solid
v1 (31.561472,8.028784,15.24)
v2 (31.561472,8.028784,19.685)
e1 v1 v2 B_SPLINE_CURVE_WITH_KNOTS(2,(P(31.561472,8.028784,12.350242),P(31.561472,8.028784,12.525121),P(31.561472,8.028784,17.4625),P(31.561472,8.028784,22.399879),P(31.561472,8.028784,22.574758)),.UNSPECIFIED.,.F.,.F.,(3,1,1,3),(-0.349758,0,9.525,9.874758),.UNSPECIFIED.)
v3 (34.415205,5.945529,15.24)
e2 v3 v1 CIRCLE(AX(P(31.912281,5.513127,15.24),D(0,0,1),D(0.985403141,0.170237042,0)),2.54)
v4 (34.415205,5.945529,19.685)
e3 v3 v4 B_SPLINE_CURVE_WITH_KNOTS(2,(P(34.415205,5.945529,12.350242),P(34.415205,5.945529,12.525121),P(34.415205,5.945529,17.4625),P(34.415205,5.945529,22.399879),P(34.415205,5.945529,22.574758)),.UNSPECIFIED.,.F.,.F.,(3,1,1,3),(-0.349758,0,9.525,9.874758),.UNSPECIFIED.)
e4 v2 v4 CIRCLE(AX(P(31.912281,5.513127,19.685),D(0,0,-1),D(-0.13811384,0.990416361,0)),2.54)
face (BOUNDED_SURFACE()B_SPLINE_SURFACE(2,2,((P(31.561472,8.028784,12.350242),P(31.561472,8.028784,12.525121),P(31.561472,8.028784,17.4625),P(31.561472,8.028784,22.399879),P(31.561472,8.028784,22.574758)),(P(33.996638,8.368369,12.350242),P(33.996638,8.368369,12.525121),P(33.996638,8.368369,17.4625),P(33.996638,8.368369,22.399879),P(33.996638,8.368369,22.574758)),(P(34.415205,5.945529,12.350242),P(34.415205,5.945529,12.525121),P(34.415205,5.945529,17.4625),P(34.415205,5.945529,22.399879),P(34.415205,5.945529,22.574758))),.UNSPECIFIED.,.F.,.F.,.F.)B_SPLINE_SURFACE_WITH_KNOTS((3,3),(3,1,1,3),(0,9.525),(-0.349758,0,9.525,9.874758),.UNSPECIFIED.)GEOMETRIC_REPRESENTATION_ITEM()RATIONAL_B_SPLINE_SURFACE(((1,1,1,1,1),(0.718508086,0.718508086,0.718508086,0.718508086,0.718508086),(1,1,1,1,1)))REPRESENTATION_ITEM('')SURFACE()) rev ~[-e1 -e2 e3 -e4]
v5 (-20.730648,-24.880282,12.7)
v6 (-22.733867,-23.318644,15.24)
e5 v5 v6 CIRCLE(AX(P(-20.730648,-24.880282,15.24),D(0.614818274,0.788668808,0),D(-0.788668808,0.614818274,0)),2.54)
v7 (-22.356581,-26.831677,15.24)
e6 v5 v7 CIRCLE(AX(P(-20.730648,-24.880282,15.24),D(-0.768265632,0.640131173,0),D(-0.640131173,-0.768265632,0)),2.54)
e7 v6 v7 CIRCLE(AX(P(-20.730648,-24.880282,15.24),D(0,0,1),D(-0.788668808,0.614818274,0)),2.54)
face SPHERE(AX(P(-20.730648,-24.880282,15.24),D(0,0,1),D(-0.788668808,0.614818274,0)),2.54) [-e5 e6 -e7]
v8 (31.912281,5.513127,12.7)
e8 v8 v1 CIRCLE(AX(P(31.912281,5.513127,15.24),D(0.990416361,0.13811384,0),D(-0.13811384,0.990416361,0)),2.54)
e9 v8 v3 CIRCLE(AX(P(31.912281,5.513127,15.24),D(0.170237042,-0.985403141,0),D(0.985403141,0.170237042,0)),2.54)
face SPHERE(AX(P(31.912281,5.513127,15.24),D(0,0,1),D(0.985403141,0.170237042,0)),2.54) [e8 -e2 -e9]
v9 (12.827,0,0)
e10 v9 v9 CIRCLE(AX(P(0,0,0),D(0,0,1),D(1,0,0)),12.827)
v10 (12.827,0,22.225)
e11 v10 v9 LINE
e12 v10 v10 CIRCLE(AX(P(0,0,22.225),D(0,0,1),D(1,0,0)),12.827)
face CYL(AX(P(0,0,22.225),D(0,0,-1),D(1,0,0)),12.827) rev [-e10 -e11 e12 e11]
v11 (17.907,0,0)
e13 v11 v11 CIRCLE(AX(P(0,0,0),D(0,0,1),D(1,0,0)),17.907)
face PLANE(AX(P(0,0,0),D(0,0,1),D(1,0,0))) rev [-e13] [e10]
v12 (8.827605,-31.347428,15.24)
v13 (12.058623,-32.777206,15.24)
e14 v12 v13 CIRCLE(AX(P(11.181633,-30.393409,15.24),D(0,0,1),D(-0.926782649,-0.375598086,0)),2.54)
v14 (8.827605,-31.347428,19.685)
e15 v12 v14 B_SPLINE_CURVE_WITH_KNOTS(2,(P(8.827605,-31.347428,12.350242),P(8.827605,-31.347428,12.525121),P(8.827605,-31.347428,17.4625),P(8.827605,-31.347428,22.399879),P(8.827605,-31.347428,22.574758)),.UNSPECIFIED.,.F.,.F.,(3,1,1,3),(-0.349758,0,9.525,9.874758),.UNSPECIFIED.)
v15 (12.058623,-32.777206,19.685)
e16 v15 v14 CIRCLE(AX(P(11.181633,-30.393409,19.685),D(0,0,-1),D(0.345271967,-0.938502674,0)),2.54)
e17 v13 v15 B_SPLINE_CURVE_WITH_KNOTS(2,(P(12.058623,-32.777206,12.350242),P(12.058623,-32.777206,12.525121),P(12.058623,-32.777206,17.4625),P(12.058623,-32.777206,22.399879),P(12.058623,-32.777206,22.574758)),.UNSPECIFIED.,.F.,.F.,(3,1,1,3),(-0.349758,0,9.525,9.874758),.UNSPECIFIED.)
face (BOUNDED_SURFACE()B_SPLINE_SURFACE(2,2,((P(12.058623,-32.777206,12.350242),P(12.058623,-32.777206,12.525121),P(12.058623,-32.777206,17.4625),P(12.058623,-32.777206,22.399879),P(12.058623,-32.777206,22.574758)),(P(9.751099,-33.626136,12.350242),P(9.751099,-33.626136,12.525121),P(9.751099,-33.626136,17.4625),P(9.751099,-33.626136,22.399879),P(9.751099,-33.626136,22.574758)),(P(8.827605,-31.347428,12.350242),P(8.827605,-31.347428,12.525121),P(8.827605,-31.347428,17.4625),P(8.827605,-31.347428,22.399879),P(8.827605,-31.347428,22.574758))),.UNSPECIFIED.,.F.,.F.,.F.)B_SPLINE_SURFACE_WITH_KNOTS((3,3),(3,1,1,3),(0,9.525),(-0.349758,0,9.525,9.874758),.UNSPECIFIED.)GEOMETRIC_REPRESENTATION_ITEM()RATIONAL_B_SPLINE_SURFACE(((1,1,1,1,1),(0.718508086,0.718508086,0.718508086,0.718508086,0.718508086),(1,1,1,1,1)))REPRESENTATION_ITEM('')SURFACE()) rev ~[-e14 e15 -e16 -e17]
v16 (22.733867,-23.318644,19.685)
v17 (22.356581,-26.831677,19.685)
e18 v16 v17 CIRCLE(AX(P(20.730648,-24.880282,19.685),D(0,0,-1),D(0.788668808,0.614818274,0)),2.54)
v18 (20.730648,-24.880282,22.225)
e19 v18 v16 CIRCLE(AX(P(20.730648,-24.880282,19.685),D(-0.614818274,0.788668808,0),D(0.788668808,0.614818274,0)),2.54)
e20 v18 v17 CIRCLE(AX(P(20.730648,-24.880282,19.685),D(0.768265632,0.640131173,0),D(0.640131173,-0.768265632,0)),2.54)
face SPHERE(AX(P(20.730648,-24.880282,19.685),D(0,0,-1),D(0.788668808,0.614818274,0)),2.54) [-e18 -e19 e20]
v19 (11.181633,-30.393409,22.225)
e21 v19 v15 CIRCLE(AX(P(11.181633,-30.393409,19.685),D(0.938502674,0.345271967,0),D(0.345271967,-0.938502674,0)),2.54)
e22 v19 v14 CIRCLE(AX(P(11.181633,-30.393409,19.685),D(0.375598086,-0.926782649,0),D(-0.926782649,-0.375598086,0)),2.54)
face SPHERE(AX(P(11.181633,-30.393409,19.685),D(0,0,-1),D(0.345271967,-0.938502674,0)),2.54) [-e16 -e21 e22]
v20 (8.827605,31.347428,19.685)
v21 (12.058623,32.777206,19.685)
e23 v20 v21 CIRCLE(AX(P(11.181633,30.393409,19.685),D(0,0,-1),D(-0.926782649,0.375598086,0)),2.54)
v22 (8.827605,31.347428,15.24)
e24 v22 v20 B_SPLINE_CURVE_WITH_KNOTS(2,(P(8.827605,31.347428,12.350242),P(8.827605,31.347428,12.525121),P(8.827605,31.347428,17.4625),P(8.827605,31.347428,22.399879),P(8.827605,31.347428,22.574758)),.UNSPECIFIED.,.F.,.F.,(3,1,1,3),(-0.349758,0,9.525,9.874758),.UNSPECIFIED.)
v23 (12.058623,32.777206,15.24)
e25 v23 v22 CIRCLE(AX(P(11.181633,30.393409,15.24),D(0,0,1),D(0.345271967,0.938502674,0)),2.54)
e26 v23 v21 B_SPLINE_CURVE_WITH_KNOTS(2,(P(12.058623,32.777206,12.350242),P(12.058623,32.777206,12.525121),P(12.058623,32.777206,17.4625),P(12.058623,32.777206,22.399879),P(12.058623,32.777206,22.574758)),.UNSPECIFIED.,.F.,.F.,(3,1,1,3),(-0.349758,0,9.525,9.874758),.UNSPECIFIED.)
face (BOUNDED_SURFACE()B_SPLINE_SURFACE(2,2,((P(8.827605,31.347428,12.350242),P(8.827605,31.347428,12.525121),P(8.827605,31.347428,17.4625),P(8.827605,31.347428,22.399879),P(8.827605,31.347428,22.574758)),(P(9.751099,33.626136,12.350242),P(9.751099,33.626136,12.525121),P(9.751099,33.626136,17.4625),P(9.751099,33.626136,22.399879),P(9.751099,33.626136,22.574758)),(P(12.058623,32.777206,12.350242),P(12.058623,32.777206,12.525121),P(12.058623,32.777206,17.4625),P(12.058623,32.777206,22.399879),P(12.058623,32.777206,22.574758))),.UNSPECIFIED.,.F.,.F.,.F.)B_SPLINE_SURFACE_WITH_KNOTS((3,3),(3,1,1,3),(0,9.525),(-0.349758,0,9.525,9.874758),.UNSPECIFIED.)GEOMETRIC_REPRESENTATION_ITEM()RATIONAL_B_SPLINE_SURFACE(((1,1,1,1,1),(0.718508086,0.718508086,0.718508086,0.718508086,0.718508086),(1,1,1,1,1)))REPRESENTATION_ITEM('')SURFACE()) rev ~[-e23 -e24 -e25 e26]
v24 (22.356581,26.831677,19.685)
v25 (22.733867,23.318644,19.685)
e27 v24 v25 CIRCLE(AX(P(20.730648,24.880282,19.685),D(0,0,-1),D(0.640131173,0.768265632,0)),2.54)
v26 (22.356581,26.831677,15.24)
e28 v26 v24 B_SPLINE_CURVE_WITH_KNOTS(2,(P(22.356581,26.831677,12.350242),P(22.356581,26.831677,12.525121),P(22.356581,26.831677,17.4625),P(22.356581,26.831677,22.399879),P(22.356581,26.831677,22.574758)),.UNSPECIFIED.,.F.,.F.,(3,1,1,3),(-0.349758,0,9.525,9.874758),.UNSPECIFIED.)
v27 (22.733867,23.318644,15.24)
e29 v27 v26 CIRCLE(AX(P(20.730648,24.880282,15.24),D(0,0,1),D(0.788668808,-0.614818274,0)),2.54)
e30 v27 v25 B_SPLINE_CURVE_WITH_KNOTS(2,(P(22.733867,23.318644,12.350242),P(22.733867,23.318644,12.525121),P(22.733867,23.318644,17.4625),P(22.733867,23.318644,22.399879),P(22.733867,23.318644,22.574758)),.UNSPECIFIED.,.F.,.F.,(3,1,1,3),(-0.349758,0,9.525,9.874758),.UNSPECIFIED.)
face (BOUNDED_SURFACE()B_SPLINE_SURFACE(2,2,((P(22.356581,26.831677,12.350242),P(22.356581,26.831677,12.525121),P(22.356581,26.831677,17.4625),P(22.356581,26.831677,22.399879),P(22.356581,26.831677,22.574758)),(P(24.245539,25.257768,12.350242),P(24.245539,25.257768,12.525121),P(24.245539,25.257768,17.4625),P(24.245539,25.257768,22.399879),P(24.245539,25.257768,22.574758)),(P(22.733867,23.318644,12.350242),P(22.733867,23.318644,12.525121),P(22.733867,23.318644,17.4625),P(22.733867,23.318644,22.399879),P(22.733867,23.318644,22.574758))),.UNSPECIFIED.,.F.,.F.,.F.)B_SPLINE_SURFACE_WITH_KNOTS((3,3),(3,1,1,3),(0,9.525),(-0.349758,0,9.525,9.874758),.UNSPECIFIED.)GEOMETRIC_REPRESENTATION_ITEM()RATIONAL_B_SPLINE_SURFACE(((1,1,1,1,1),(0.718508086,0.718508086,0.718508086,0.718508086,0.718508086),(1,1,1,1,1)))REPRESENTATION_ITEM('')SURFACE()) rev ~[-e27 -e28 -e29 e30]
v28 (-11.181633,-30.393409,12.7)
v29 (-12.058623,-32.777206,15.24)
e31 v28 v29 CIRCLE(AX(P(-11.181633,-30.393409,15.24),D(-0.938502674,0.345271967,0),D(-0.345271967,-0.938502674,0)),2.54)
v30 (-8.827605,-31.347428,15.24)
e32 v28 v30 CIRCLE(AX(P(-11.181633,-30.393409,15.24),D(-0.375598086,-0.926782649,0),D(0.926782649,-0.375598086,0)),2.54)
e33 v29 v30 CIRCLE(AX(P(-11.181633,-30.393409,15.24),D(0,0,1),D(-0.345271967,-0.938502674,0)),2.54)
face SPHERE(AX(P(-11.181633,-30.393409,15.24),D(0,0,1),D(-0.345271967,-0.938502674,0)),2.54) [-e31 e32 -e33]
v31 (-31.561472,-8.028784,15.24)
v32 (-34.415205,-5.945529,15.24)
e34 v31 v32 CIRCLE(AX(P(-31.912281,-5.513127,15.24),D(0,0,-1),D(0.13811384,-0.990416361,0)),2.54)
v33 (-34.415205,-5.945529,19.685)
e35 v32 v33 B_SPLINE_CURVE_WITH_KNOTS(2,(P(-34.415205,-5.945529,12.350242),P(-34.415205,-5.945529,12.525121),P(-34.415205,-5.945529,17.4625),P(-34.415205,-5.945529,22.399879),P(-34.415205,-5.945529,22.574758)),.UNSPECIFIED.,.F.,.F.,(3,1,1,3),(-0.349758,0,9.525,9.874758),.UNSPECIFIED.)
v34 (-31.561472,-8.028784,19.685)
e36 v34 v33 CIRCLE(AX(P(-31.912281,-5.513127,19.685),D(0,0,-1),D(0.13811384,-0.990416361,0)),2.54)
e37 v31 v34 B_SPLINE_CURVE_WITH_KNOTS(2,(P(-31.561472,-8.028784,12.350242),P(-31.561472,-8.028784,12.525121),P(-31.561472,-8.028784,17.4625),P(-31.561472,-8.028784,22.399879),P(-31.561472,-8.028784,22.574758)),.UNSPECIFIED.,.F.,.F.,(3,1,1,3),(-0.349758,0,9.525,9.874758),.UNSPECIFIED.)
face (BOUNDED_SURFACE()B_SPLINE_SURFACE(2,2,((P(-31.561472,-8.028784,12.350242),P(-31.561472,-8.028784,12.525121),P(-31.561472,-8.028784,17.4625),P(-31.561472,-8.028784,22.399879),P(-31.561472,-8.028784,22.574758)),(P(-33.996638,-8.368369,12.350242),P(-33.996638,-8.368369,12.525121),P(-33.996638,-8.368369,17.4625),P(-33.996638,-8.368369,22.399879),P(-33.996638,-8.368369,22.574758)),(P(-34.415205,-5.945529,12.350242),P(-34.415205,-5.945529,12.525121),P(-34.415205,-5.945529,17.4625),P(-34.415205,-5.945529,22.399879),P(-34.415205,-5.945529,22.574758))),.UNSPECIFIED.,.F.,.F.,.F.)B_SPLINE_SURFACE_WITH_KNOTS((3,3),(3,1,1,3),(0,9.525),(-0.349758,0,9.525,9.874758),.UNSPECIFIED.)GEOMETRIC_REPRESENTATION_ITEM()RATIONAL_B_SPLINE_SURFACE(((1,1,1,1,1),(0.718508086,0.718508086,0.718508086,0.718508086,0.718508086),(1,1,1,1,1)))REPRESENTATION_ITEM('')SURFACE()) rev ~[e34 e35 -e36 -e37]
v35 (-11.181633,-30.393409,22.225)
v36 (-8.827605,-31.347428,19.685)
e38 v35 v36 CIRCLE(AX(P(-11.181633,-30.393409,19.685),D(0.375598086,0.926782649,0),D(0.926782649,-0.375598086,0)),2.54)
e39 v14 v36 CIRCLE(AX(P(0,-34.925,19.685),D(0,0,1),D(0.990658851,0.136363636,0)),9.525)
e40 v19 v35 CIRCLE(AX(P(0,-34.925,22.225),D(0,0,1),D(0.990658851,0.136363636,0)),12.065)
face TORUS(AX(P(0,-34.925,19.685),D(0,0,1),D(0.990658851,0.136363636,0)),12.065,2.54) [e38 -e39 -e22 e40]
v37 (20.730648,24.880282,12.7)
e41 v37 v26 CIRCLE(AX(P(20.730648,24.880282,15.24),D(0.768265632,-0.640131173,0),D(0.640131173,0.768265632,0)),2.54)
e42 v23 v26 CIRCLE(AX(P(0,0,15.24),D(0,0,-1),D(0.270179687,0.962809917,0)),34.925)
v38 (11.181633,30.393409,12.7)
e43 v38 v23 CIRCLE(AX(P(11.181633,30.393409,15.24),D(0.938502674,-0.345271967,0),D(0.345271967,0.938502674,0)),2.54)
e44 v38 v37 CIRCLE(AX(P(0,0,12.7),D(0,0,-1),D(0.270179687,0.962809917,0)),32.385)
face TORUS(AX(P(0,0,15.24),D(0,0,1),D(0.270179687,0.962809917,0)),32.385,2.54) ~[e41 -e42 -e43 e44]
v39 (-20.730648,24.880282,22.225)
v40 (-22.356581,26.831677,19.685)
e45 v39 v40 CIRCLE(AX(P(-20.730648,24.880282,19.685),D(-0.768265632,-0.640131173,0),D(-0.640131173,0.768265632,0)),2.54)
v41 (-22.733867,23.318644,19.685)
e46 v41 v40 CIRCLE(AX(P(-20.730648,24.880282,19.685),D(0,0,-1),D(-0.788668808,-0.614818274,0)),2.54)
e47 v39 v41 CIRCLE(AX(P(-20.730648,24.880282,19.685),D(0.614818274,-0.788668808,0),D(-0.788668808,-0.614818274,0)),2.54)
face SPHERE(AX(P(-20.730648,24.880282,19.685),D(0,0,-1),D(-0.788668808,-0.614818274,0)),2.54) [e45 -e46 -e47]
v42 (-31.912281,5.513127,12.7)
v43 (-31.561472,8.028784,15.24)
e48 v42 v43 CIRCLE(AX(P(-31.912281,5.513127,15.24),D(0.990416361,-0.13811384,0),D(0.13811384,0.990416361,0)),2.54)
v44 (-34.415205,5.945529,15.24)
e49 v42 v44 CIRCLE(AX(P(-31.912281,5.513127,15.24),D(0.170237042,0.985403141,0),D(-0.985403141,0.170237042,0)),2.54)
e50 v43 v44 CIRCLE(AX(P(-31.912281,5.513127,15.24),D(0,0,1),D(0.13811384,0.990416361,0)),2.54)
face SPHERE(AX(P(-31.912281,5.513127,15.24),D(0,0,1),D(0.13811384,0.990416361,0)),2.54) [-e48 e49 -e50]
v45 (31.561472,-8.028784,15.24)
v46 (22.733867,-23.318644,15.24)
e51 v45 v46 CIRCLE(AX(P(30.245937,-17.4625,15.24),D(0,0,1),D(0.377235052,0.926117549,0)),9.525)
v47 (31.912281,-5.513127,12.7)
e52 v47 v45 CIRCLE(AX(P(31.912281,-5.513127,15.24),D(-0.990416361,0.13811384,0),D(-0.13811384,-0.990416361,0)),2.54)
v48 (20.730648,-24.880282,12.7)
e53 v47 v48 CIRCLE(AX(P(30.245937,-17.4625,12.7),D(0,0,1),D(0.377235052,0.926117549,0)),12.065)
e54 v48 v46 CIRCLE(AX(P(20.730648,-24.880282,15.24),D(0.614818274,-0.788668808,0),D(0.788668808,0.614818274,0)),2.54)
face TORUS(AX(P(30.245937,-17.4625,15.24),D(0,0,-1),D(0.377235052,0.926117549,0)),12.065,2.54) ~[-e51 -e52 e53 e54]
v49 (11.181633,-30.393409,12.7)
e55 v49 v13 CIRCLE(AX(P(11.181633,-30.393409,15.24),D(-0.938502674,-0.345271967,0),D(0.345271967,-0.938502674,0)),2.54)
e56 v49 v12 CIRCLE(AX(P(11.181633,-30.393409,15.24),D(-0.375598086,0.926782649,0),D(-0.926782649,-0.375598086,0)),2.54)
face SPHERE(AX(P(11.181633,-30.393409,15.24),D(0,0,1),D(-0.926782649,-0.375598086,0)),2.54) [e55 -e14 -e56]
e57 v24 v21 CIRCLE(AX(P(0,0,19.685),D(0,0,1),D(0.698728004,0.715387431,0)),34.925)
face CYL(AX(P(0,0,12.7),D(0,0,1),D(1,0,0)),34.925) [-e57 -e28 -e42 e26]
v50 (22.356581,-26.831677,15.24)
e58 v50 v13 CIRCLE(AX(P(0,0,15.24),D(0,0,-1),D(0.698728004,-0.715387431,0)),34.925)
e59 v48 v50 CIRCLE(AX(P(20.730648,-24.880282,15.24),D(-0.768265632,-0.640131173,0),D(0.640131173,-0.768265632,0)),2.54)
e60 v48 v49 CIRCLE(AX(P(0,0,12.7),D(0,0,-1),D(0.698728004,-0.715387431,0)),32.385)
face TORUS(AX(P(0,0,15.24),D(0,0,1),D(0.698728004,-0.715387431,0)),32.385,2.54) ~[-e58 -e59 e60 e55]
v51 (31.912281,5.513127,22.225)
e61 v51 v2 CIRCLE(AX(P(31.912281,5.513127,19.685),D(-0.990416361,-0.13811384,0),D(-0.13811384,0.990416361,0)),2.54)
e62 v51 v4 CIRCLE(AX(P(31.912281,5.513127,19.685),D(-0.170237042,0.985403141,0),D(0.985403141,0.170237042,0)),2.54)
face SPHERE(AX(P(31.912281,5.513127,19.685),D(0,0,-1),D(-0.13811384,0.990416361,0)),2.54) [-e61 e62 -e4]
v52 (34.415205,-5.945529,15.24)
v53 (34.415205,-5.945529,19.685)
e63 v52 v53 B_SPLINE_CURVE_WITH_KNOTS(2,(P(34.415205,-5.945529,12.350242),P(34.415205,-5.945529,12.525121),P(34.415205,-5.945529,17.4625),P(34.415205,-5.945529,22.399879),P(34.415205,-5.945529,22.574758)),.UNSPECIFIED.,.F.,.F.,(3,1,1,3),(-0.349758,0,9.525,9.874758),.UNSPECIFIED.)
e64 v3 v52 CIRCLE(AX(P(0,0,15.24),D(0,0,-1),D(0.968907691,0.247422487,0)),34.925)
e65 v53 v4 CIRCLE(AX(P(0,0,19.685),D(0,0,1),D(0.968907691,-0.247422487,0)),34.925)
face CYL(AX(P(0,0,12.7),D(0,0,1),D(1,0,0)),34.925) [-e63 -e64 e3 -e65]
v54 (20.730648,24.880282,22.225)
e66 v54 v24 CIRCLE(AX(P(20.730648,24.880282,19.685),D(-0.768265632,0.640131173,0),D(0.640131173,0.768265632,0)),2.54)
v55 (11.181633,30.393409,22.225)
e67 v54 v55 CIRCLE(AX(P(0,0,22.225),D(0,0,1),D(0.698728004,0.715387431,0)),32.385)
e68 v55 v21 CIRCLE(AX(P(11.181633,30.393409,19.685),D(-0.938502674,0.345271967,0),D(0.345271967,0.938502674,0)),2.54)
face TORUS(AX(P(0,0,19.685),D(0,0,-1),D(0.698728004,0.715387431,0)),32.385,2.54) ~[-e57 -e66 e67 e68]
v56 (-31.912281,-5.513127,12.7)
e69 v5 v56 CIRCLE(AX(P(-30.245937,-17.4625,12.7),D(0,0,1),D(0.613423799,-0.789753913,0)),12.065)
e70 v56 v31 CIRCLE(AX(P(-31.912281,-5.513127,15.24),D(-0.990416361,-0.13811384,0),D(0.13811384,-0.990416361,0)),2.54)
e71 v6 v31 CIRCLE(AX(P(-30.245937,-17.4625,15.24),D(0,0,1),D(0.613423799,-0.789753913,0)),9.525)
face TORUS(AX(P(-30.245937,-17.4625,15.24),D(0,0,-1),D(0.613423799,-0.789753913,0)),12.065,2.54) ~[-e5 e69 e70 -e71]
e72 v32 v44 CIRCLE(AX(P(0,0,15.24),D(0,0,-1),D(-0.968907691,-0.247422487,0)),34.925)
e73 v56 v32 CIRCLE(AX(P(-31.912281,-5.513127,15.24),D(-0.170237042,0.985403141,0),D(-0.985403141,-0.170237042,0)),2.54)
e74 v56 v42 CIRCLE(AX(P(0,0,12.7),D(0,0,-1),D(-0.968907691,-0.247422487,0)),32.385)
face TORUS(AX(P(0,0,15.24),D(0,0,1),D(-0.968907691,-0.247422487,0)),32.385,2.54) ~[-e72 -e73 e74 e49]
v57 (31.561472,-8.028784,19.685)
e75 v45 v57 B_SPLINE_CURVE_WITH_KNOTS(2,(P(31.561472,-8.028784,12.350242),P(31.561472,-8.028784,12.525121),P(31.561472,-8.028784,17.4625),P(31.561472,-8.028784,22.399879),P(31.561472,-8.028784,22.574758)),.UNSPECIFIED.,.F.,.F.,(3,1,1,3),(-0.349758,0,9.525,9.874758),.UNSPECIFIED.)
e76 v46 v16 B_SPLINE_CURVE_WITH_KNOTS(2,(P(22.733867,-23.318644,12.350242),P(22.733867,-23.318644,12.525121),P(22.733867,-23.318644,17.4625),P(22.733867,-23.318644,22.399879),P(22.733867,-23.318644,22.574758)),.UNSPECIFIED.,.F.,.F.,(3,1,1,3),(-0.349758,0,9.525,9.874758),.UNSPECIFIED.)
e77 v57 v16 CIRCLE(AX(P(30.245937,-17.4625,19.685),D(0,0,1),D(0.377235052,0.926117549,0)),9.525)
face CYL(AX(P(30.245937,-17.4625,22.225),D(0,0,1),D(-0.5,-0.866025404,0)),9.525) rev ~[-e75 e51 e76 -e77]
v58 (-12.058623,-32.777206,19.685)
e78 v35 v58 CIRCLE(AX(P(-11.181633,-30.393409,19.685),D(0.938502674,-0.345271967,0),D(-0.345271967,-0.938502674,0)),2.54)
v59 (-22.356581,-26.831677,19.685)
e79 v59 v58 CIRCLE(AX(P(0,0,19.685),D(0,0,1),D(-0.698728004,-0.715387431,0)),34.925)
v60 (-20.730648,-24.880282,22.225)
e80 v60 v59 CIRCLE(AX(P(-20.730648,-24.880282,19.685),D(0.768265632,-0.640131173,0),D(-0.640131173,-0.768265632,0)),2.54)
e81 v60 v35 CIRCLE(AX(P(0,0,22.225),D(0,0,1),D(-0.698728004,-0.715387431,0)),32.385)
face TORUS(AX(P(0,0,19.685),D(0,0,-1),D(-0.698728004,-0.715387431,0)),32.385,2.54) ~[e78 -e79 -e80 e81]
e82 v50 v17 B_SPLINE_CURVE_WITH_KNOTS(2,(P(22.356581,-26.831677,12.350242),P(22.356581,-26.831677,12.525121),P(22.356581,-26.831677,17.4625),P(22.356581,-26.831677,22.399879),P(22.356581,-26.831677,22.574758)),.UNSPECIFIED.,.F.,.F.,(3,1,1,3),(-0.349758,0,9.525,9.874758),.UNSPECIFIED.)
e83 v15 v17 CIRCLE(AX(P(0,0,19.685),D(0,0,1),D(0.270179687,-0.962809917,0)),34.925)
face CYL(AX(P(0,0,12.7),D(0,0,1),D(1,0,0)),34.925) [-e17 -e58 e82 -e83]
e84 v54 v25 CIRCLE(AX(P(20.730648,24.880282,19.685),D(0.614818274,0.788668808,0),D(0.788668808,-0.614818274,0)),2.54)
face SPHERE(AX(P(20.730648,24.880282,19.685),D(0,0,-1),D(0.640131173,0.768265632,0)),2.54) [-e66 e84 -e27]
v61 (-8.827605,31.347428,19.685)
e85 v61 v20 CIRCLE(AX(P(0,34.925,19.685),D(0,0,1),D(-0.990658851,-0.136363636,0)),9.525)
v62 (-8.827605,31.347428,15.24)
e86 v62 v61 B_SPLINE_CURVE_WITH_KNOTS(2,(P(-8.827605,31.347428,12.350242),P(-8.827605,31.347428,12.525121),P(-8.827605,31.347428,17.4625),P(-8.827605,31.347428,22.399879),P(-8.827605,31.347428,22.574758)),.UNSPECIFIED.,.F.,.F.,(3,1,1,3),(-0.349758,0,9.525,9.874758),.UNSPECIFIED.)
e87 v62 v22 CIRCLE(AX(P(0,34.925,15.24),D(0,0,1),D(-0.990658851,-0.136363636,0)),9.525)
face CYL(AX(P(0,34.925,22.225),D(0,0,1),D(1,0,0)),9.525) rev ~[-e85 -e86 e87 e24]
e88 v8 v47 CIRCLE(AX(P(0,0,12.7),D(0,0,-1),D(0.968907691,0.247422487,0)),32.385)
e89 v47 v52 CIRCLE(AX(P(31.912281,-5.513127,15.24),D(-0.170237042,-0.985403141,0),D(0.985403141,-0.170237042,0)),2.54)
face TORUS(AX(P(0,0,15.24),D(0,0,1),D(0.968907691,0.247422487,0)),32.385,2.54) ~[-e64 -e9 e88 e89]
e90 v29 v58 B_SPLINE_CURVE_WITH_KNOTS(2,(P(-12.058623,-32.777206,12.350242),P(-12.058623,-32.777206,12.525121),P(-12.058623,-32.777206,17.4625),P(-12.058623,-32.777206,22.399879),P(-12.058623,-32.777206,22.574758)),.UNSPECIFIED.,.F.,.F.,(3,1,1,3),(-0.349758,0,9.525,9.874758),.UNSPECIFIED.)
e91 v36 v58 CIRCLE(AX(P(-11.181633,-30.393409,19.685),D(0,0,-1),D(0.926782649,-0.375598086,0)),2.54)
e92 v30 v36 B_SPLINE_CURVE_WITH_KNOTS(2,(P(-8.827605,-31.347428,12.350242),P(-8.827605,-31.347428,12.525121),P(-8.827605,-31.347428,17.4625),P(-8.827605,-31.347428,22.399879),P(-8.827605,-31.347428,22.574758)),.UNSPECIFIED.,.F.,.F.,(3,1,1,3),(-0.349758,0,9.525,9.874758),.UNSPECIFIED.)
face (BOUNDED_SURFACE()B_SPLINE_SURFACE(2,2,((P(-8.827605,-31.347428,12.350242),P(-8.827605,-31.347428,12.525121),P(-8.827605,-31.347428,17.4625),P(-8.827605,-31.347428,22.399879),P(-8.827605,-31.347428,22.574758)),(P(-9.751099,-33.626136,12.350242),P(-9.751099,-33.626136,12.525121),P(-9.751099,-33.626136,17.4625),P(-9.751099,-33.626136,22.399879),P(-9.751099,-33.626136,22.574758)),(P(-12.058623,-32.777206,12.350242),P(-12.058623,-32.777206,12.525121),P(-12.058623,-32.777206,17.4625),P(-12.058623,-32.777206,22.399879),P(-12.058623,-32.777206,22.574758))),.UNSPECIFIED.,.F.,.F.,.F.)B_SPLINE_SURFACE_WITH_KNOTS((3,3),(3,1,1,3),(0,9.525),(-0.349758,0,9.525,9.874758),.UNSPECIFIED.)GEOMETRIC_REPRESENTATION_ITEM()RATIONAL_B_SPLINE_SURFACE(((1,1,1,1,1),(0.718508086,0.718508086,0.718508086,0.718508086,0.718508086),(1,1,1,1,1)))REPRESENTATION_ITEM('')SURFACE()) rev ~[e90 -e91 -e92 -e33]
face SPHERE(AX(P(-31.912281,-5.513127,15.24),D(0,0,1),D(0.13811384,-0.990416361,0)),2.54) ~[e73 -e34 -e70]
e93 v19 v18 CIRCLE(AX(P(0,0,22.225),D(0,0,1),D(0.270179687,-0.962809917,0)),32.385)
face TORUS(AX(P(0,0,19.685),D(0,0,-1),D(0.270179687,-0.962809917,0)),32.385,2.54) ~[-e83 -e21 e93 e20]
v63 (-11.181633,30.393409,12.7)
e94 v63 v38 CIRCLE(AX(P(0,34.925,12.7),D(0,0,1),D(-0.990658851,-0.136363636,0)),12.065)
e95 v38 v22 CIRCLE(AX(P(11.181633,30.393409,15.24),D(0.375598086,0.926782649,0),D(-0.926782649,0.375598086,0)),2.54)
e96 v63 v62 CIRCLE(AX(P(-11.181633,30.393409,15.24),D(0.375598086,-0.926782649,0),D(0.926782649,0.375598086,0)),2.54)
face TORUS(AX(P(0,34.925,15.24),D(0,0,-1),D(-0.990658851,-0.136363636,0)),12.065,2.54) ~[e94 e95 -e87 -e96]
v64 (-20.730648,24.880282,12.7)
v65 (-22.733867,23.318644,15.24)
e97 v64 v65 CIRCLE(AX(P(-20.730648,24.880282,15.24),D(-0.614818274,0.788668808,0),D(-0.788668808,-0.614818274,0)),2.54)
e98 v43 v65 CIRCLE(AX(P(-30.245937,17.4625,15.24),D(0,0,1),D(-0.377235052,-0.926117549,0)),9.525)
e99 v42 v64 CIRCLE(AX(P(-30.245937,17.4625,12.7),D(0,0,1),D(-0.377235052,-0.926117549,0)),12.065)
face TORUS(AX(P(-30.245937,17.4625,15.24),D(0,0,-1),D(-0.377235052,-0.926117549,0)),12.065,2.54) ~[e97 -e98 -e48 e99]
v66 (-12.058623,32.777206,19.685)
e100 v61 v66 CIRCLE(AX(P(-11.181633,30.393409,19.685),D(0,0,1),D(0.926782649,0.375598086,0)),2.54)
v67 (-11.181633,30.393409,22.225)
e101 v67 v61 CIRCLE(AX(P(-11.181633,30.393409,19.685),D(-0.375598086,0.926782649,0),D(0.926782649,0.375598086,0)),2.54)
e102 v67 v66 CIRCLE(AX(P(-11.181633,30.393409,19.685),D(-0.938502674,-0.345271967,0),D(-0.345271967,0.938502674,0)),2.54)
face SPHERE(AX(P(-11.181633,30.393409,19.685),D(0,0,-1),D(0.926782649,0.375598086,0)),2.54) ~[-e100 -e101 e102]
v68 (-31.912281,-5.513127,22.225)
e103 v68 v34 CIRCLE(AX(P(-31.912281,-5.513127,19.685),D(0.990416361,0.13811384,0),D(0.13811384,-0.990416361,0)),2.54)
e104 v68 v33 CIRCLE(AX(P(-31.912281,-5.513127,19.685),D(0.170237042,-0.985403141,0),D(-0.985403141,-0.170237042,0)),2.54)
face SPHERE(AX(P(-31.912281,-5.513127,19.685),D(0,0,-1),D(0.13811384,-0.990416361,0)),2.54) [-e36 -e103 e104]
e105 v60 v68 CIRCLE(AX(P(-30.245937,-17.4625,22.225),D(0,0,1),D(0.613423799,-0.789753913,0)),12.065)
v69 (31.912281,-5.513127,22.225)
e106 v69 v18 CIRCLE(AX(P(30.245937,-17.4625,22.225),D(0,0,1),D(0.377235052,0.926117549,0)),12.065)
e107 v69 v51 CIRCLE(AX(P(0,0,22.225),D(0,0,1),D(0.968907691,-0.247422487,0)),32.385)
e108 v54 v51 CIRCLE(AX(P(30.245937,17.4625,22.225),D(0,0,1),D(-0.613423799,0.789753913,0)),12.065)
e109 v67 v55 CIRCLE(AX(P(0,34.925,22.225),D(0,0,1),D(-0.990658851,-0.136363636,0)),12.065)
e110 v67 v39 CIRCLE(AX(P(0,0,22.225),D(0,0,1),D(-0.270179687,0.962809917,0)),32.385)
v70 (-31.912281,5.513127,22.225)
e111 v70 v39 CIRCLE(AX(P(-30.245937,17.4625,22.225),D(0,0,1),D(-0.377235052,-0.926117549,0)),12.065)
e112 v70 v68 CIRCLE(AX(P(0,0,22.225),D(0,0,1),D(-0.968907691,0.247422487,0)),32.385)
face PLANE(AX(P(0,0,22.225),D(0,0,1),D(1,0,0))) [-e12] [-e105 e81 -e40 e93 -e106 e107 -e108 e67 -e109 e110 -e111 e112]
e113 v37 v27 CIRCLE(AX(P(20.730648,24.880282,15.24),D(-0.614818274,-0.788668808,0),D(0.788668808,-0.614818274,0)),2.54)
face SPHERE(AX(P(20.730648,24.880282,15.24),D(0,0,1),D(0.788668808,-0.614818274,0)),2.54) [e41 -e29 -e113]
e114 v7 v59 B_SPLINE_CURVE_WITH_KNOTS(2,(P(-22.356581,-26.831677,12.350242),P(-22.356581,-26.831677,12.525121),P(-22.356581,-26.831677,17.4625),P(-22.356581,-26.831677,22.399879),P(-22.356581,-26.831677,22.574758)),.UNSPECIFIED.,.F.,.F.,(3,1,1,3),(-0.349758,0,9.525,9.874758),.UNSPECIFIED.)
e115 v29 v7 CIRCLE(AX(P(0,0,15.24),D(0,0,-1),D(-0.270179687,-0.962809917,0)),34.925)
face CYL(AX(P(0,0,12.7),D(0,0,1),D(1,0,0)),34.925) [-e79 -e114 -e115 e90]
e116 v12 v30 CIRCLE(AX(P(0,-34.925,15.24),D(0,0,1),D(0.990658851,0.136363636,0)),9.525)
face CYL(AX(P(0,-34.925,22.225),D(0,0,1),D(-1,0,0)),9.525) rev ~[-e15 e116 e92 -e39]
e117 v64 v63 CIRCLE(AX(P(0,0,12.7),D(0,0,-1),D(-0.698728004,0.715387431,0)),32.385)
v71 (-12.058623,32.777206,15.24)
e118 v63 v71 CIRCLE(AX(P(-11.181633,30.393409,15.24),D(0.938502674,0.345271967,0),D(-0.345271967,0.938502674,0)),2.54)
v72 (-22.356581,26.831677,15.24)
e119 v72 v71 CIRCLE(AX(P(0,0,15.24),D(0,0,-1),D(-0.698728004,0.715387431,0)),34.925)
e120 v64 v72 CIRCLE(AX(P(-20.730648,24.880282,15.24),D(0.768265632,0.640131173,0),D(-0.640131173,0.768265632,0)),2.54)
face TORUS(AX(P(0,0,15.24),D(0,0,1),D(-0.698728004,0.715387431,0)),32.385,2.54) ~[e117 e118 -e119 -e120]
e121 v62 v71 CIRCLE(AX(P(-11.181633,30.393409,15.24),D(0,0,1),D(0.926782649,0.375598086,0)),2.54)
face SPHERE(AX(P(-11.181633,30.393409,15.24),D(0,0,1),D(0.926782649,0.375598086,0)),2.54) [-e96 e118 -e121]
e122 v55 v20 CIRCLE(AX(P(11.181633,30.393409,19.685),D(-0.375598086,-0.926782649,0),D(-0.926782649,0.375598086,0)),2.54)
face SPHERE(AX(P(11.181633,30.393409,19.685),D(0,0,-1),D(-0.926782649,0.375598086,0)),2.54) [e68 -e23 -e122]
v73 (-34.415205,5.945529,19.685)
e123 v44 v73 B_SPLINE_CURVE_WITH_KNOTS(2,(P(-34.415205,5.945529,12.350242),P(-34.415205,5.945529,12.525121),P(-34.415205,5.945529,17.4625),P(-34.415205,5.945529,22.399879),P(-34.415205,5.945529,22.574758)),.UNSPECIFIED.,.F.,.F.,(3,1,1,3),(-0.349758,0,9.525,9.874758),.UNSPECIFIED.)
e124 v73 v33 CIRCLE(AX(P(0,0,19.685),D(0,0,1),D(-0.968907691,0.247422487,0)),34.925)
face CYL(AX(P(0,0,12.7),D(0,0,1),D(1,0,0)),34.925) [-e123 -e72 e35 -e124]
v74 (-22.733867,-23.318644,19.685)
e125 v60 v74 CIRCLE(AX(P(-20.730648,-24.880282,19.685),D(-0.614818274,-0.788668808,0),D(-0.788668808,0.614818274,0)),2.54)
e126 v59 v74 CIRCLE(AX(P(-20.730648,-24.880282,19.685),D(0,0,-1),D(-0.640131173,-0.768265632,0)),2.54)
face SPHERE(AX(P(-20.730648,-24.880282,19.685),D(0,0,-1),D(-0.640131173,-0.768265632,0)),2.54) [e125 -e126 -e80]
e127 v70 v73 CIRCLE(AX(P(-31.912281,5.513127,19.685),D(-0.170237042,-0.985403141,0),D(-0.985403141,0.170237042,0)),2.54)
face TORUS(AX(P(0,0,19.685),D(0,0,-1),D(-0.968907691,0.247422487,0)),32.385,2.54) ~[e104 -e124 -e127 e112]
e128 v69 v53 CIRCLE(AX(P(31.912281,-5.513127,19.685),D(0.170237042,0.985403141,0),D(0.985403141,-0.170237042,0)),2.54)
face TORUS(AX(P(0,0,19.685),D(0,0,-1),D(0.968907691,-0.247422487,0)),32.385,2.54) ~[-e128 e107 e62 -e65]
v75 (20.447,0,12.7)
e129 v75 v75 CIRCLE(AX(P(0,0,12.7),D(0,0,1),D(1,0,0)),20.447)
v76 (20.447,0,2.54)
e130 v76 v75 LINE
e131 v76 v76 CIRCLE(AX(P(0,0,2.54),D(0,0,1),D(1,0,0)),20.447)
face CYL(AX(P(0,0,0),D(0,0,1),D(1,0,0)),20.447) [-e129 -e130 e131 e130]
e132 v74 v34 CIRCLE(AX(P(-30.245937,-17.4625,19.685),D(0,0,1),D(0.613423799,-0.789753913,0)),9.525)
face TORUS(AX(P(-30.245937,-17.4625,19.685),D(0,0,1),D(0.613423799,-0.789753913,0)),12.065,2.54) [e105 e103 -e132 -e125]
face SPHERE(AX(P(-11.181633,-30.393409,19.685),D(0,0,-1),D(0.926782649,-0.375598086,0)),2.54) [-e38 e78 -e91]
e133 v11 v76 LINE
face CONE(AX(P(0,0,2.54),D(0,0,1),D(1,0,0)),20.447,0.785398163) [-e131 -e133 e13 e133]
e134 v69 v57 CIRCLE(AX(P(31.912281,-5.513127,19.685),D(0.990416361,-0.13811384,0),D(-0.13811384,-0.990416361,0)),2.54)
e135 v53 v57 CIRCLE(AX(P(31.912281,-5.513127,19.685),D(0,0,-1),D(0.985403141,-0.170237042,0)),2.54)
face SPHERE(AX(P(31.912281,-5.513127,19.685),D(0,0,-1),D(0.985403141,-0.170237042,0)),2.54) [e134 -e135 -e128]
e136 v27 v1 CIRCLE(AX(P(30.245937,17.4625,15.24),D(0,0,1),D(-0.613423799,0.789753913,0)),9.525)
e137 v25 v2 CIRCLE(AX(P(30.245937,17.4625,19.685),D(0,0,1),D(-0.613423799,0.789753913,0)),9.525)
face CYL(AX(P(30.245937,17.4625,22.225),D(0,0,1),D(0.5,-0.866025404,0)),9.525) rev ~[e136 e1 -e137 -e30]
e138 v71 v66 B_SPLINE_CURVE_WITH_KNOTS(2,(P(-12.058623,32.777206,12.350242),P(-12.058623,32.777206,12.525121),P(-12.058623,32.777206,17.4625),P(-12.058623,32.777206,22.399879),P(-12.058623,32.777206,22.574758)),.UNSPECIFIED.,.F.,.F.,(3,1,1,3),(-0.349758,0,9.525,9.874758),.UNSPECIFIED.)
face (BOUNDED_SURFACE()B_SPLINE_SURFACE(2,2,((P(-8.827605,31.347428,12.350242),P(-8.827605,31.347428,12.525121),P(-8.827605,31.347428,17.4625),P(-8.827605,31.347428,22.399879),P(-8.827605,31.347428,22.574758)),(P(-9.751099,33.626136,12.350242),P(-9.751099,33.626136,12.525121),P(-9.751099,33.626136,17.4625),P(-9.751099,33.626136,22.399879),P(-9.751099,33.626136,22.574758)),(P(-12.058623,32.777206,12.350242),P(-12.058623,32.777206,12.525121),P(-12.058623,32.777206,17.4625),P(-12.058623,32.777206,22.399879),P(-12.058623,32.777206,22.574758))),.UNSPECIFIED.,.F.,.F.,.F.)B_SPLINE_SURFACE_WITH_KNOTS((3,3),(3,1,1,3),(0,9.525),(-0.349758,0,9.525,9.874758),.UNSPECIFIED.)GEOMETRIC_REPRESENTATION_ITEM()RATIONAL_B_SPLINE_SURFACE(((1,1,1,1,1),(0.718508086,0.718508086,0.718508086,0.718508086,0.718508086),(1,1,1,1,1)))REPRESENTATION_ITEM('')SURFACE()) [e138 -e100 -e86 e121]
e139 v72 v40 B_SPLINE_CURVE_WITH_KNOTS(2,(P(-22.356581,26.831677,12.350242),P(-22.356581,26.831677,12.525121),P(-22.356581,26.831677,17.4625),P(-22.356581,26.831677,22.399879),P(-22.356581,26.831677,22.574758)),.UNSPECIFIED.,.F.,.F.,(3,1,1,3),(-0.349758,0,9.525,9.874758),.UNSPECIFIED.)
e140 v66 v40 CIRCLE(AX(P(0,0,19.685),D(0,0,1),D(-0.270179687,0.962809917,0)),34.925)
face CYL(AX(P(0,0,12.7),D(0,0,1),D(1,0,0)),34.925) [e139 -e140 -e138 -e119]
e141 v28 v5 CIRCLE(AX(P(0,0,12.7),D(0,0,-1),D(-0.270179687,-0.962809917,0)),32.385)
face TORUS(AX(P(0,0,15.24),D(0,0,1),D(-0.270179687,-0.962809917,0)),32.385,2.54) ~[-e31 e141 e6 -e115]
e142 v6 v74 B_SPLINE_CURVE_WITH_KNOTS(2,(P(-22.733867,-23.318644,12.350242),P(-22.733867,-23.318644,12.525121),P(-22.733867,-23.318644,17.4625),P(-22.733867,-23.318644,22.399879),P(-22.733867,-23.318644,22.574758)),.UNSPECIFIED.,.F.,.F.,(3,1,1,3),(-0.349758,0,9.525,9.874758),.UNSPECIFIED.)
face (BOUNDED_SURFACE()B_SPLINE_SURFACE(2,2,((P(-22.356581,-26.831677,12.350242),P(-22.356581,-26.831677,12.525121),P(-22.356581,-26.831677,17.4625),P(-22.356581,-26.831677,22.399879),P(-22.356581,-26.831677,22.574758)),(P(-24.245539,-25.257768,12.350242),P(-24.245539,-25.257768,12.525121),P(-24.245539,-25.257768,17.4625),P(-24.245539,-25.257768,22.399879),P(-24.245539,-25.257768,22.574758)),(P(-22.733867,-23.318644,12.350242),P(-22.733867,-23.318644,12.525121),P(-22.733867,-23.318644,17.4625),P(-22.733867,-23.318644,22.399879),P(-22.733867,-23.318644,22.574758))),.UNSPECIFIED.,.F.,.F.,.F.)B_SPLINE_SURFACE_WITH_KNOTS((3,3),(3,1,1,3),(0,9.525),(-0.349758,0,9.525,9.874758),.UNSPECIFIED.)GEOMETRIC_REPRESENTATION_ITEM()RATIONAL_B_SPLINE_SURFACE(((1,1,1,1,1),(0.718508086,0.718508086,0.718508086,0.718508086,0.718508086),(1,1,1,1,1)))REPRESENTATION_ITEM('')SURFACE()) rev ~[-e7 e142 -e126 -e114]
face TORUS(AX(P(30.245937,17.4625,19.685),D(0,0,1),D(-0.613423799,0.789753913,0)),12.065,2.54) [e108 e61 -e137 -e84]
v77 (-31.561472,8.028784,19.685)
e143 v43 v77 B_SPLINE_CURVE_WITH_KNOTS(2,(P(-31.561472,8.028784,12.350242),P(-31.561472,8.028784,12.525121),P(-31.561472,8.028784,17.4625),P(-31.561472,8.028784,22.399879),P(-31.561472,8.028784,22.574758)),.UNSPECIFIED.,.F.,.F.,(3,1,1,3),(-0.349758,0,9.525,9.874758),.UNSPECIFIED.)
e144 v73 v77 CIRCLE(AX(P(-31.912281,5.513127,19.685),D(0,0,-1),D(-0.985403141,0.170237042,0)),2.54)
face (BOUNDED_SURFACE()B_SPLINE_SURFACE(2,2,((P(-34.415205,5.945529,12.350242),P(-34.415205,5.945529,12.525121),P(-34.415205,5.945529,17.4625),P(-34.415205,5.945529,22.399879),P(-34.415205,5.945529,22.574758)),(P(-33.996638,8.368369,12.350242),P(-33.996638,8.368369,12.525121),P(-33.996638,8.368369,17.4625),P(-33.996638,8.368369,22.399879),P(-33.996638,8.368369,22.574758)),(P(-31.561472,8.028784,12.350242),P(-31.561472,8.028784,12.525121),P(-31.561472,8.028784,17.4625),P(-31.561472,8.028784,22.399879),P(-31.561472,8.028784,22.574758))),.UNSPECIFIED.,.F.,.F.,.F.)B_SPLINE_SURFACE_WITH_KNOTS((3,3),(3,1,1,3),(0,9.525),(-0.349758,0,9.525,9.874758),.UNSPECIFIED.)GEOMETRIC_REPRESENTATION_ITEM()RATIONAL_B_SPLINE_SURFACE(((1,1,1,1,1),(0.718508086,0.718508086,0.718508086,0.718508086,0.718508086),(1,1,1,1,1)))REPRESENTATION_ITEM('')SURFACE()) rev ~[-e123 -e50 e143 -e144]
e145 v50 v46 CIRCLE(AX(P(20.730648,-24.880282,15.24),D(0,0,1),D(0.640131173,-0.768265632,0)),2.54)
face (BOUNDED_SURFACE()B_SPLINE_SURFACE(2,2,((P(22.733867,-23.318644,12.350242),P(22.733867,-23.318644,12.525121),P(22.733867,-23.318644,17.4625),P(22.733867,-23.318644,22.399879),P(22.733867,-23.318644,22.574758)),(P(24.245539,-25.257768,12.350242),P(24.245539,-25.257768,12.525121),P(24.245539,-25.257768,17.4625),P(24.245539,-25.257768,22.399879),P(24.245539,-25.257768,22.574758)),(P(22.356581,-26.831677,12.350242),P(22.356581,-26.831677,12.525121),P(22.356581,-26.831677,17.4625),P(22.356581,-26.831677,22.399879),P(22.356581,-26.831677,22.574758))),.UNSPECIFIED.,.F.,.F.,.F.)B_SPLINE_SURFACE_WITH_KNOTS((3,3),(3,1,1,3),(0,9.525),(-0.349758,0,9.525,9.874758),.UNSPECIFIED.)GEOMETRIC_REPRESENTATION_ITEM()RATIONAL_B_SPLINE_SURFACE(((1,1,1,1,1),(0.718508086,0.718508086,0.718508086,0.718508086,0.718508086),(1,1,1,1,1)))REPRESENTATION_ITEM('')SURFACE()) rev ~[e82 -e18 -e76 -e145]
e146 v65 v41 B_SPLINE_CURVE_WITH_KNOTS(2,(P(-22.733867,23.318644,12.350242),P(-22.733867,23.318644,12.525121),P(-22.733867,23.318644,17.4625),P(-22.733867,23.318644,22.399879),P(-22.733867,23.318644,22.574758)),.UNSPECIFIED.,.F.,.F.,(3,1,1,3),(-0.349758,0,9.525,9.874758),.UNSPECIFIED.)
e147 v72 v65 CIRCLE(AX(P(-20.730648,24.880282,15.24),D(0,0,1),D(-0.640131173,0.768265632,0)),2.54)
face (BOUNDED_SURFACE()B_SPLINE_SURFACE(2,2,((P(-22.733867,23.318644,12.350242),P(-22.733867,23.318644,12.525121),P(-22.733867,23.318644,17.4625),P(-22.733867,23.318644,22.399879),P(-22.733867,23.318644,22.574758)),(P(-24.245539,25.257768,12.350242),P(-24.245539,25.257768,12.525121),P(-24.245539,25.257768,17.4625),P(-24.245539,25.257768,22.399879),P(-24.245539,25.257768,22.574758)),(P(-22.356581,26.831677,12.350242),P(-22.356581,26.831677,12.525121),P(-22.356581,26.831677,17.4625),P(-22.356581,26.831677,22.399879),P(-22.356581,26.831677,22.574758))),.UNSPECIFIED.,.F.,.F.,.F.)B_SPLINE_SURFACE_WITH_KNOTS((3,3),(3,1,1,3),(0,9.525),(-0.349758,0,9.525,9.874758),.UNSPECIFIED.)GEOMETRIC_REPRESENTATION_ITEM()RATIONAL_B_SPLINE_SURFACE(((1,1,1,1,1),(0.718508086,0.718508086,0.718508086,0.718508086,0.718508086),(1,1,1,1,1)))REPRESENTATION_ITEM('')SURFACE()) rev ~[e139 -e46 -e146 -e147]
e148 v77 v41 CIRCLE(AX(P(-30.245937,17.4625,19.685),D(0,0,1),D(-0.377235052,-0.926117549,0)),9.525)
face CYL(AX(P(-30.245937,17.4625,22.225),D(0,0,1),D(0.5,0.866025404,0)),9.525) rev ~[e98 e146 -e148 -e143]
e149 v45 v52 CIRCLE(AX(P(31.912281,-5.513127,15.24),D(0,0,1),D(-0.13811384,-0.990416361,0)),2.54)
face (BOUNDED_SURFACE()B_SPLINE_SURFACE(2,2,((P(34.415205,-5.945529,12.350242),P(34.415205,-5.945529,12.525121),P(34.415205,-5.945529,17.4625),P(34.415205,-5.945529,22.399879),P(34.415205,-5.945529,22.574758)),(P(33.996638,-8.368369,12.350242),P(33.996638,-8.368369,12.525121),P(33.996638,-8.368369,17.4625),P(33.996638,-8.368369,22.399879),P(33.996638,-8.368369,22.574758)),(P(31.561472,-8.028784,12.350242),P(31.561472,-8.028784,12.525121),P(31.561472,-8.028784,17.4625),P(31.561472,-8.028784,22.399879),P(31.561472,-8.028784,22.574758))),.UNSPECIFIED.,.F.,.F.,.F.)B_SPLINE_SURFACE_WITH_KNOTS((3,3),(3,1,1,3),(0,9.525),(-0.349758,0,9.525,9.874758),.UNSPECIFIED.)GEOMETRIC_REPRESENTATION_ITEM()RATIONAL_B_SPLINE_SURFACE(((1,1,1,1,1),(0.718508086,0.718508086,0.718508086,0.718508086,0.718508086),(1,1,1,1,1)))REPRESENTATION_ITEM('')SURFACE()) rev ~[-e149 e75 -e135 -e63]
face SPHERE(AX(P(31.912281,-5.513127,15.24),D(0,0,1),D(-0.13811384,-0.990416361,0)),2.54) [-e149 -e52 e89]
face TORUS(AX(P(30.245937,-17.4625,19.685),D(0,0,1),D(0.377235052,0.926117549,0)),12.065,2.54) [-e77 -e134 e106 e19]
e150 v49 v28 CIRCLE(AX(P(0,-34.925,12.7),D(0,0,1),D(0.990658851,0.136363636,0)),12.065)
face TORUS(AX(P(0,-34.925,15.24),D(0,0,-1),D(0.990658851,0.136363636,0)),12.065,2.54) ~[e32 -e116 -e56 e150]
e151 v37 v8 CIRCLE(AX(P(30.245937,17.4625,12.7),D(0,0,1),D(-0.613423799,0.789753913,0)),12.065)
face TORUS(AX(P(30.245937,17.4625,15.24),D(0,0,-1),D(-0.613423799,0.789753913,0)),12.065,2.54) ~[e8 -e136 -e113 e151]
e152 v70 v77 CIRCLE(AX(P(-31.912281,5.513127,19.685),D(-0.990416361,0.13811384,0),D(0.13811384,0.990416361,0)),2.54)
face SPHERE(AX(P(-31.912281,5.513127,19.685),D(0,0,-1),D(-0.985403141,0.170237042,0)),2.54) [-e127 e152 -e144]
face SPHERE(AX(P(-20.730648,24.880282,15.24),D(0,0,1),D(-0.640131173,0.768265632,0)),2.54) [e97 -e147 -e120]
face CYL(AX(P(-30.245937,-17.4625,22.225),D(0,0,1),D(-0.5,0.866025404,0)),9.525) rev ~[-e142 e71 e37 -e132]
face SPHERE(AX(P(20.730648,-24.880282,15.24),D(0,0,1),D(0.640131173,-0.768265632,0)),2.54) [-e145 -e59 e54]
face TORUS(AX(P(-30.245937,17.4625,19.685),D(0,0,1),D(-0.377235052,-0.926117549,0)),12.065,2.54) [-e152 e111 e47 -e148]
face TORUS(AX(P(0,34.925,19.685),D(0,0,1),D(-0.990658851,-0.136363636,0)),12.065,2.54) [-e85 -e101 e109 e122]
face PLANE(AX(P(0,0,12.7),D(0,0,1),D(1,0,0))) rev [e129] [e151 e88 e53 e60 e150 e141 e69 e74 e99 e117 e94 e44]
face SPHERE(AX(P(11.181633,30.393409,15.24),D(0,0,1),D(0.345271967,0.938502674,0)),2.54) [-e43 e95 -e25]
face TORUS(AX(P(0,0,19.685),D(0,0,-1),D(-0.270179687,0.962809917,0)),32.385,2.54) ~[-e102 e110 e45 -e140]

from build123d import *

# Parameters (mm, degrees)
F2_SIZE         = 2.54
F3_R            = 9.525
F4_DEPTH        = 22.226
F4_COPIES_COUNT = 6
F6_R            = 2.54


# Not quite as in the source:
# - a feature of the source that left no trace in its solid (it failed there, or was rolled back) is left out
# - a pattern or mirror of a feature is missing from the dataset's text; its kind, count and spacing are read off the source's solid


with BuildPart() as f1:
    # F0 (on Front) → F1 (revolve)
    with BuildSketch(Plane.XZ):
        Polygon((12.827, 22.225), (12.827, 0), (20.447, 0), (20.447, 12.7), (34.925, 12.7), (34.925, 22.225), align=None)
    revolve(axis=Axis((0, 0, 15.6002613144), (0, 0, 1)))

    # F2
    f2_edges = [f1.edges().sort_by_distance(p)[0] for p in [
        (-20.447, 0, 0),
    ]]
    chamfer(f2_edges, length=F2_SIZE)

    # F3 (on face) → F4 (cut, through all)
    with BuildSketch(Plane.XY.offset(22.225)):
        with Locations((0, 34.925)):
            Circle(F3_R)
    f4 = extrude(amount=-F4_DEPTH, mode=Mode.SUBTRACT)

    # F4_copies: F4 ×6 about axis
    f4_copies_axis = Axis((0, 0, 0), (0, 0, 1))
    for i in range(1, F4_COPIES_COUNT):
        add(f4.rotate(f4_copies_axis, i * 360 / F4_COPIES_COUNT), mode=Mode.SUBTRACT)

    # F6
    f6_edges = [f1.edges().sort_by_distance(p)[0] for p in [
        (0, 25.4, 22.225),
        (17.4625, 30.245937, 22.225),
        (21.997045, 12.7, 22.225),
        (34.925, 0, 22.225),
        (21.997045, -12.7, 22.225),
        (17.4625, -30.245937, 22.225),
        (0, -25.4, 22.225),
        (-17.4625, -30.245937, 22.225),
        (-21.997045, -12.7, 22.225),
        (-34.925, 0, 22.225),
        (-21.997045, 12.7, 22.225),
        (-17.4625, 30.245937, 22.225),
        (-21.997045, -12.7, 12.7),
        (-17.4625, -30.245937, 12.7),
        (0, -25.4, 12.7),
        (17.4625, -30.245937, 12.7),
        (21.997045, -12.7, 12.7),
        (34.925, 0, 12.7),
        (21.997045, 12.7, 12.7),
        (17.4625, 30.245937, 12.7),
        (0, 25.4, 12.7),
        (-17.4625, 30.245937, 12.7),
        (-21.997045, 12.7, 12.7),
        (-34.925, 0, 12.7),
        (9.436026, 33.626136, 17.4625),
        (-9.436026, 33.626136, 17.4625),
        (24.403076, 24.984906, 17.4625),
        (33.839101, 8.64123, 17.4625),
        (33.839101, -8.64123, 17.4625),
        (24.403076, -24.984906, 17.4625),
        (9.436026, -33.626136, 17.4625),
        (-9.436026, -33.626136, 17.4625),
        (-24.403076, -24.984906, 17.4625),
        (-33.839101, -8.64123, 17.4625),
        (-33.839101, 8.64123, 17.4625),
        (-24.403076, 24.984906, 17.4625),
    ]]
    fillet(f6_edges, radius=F6_R)


solid = f1.part
